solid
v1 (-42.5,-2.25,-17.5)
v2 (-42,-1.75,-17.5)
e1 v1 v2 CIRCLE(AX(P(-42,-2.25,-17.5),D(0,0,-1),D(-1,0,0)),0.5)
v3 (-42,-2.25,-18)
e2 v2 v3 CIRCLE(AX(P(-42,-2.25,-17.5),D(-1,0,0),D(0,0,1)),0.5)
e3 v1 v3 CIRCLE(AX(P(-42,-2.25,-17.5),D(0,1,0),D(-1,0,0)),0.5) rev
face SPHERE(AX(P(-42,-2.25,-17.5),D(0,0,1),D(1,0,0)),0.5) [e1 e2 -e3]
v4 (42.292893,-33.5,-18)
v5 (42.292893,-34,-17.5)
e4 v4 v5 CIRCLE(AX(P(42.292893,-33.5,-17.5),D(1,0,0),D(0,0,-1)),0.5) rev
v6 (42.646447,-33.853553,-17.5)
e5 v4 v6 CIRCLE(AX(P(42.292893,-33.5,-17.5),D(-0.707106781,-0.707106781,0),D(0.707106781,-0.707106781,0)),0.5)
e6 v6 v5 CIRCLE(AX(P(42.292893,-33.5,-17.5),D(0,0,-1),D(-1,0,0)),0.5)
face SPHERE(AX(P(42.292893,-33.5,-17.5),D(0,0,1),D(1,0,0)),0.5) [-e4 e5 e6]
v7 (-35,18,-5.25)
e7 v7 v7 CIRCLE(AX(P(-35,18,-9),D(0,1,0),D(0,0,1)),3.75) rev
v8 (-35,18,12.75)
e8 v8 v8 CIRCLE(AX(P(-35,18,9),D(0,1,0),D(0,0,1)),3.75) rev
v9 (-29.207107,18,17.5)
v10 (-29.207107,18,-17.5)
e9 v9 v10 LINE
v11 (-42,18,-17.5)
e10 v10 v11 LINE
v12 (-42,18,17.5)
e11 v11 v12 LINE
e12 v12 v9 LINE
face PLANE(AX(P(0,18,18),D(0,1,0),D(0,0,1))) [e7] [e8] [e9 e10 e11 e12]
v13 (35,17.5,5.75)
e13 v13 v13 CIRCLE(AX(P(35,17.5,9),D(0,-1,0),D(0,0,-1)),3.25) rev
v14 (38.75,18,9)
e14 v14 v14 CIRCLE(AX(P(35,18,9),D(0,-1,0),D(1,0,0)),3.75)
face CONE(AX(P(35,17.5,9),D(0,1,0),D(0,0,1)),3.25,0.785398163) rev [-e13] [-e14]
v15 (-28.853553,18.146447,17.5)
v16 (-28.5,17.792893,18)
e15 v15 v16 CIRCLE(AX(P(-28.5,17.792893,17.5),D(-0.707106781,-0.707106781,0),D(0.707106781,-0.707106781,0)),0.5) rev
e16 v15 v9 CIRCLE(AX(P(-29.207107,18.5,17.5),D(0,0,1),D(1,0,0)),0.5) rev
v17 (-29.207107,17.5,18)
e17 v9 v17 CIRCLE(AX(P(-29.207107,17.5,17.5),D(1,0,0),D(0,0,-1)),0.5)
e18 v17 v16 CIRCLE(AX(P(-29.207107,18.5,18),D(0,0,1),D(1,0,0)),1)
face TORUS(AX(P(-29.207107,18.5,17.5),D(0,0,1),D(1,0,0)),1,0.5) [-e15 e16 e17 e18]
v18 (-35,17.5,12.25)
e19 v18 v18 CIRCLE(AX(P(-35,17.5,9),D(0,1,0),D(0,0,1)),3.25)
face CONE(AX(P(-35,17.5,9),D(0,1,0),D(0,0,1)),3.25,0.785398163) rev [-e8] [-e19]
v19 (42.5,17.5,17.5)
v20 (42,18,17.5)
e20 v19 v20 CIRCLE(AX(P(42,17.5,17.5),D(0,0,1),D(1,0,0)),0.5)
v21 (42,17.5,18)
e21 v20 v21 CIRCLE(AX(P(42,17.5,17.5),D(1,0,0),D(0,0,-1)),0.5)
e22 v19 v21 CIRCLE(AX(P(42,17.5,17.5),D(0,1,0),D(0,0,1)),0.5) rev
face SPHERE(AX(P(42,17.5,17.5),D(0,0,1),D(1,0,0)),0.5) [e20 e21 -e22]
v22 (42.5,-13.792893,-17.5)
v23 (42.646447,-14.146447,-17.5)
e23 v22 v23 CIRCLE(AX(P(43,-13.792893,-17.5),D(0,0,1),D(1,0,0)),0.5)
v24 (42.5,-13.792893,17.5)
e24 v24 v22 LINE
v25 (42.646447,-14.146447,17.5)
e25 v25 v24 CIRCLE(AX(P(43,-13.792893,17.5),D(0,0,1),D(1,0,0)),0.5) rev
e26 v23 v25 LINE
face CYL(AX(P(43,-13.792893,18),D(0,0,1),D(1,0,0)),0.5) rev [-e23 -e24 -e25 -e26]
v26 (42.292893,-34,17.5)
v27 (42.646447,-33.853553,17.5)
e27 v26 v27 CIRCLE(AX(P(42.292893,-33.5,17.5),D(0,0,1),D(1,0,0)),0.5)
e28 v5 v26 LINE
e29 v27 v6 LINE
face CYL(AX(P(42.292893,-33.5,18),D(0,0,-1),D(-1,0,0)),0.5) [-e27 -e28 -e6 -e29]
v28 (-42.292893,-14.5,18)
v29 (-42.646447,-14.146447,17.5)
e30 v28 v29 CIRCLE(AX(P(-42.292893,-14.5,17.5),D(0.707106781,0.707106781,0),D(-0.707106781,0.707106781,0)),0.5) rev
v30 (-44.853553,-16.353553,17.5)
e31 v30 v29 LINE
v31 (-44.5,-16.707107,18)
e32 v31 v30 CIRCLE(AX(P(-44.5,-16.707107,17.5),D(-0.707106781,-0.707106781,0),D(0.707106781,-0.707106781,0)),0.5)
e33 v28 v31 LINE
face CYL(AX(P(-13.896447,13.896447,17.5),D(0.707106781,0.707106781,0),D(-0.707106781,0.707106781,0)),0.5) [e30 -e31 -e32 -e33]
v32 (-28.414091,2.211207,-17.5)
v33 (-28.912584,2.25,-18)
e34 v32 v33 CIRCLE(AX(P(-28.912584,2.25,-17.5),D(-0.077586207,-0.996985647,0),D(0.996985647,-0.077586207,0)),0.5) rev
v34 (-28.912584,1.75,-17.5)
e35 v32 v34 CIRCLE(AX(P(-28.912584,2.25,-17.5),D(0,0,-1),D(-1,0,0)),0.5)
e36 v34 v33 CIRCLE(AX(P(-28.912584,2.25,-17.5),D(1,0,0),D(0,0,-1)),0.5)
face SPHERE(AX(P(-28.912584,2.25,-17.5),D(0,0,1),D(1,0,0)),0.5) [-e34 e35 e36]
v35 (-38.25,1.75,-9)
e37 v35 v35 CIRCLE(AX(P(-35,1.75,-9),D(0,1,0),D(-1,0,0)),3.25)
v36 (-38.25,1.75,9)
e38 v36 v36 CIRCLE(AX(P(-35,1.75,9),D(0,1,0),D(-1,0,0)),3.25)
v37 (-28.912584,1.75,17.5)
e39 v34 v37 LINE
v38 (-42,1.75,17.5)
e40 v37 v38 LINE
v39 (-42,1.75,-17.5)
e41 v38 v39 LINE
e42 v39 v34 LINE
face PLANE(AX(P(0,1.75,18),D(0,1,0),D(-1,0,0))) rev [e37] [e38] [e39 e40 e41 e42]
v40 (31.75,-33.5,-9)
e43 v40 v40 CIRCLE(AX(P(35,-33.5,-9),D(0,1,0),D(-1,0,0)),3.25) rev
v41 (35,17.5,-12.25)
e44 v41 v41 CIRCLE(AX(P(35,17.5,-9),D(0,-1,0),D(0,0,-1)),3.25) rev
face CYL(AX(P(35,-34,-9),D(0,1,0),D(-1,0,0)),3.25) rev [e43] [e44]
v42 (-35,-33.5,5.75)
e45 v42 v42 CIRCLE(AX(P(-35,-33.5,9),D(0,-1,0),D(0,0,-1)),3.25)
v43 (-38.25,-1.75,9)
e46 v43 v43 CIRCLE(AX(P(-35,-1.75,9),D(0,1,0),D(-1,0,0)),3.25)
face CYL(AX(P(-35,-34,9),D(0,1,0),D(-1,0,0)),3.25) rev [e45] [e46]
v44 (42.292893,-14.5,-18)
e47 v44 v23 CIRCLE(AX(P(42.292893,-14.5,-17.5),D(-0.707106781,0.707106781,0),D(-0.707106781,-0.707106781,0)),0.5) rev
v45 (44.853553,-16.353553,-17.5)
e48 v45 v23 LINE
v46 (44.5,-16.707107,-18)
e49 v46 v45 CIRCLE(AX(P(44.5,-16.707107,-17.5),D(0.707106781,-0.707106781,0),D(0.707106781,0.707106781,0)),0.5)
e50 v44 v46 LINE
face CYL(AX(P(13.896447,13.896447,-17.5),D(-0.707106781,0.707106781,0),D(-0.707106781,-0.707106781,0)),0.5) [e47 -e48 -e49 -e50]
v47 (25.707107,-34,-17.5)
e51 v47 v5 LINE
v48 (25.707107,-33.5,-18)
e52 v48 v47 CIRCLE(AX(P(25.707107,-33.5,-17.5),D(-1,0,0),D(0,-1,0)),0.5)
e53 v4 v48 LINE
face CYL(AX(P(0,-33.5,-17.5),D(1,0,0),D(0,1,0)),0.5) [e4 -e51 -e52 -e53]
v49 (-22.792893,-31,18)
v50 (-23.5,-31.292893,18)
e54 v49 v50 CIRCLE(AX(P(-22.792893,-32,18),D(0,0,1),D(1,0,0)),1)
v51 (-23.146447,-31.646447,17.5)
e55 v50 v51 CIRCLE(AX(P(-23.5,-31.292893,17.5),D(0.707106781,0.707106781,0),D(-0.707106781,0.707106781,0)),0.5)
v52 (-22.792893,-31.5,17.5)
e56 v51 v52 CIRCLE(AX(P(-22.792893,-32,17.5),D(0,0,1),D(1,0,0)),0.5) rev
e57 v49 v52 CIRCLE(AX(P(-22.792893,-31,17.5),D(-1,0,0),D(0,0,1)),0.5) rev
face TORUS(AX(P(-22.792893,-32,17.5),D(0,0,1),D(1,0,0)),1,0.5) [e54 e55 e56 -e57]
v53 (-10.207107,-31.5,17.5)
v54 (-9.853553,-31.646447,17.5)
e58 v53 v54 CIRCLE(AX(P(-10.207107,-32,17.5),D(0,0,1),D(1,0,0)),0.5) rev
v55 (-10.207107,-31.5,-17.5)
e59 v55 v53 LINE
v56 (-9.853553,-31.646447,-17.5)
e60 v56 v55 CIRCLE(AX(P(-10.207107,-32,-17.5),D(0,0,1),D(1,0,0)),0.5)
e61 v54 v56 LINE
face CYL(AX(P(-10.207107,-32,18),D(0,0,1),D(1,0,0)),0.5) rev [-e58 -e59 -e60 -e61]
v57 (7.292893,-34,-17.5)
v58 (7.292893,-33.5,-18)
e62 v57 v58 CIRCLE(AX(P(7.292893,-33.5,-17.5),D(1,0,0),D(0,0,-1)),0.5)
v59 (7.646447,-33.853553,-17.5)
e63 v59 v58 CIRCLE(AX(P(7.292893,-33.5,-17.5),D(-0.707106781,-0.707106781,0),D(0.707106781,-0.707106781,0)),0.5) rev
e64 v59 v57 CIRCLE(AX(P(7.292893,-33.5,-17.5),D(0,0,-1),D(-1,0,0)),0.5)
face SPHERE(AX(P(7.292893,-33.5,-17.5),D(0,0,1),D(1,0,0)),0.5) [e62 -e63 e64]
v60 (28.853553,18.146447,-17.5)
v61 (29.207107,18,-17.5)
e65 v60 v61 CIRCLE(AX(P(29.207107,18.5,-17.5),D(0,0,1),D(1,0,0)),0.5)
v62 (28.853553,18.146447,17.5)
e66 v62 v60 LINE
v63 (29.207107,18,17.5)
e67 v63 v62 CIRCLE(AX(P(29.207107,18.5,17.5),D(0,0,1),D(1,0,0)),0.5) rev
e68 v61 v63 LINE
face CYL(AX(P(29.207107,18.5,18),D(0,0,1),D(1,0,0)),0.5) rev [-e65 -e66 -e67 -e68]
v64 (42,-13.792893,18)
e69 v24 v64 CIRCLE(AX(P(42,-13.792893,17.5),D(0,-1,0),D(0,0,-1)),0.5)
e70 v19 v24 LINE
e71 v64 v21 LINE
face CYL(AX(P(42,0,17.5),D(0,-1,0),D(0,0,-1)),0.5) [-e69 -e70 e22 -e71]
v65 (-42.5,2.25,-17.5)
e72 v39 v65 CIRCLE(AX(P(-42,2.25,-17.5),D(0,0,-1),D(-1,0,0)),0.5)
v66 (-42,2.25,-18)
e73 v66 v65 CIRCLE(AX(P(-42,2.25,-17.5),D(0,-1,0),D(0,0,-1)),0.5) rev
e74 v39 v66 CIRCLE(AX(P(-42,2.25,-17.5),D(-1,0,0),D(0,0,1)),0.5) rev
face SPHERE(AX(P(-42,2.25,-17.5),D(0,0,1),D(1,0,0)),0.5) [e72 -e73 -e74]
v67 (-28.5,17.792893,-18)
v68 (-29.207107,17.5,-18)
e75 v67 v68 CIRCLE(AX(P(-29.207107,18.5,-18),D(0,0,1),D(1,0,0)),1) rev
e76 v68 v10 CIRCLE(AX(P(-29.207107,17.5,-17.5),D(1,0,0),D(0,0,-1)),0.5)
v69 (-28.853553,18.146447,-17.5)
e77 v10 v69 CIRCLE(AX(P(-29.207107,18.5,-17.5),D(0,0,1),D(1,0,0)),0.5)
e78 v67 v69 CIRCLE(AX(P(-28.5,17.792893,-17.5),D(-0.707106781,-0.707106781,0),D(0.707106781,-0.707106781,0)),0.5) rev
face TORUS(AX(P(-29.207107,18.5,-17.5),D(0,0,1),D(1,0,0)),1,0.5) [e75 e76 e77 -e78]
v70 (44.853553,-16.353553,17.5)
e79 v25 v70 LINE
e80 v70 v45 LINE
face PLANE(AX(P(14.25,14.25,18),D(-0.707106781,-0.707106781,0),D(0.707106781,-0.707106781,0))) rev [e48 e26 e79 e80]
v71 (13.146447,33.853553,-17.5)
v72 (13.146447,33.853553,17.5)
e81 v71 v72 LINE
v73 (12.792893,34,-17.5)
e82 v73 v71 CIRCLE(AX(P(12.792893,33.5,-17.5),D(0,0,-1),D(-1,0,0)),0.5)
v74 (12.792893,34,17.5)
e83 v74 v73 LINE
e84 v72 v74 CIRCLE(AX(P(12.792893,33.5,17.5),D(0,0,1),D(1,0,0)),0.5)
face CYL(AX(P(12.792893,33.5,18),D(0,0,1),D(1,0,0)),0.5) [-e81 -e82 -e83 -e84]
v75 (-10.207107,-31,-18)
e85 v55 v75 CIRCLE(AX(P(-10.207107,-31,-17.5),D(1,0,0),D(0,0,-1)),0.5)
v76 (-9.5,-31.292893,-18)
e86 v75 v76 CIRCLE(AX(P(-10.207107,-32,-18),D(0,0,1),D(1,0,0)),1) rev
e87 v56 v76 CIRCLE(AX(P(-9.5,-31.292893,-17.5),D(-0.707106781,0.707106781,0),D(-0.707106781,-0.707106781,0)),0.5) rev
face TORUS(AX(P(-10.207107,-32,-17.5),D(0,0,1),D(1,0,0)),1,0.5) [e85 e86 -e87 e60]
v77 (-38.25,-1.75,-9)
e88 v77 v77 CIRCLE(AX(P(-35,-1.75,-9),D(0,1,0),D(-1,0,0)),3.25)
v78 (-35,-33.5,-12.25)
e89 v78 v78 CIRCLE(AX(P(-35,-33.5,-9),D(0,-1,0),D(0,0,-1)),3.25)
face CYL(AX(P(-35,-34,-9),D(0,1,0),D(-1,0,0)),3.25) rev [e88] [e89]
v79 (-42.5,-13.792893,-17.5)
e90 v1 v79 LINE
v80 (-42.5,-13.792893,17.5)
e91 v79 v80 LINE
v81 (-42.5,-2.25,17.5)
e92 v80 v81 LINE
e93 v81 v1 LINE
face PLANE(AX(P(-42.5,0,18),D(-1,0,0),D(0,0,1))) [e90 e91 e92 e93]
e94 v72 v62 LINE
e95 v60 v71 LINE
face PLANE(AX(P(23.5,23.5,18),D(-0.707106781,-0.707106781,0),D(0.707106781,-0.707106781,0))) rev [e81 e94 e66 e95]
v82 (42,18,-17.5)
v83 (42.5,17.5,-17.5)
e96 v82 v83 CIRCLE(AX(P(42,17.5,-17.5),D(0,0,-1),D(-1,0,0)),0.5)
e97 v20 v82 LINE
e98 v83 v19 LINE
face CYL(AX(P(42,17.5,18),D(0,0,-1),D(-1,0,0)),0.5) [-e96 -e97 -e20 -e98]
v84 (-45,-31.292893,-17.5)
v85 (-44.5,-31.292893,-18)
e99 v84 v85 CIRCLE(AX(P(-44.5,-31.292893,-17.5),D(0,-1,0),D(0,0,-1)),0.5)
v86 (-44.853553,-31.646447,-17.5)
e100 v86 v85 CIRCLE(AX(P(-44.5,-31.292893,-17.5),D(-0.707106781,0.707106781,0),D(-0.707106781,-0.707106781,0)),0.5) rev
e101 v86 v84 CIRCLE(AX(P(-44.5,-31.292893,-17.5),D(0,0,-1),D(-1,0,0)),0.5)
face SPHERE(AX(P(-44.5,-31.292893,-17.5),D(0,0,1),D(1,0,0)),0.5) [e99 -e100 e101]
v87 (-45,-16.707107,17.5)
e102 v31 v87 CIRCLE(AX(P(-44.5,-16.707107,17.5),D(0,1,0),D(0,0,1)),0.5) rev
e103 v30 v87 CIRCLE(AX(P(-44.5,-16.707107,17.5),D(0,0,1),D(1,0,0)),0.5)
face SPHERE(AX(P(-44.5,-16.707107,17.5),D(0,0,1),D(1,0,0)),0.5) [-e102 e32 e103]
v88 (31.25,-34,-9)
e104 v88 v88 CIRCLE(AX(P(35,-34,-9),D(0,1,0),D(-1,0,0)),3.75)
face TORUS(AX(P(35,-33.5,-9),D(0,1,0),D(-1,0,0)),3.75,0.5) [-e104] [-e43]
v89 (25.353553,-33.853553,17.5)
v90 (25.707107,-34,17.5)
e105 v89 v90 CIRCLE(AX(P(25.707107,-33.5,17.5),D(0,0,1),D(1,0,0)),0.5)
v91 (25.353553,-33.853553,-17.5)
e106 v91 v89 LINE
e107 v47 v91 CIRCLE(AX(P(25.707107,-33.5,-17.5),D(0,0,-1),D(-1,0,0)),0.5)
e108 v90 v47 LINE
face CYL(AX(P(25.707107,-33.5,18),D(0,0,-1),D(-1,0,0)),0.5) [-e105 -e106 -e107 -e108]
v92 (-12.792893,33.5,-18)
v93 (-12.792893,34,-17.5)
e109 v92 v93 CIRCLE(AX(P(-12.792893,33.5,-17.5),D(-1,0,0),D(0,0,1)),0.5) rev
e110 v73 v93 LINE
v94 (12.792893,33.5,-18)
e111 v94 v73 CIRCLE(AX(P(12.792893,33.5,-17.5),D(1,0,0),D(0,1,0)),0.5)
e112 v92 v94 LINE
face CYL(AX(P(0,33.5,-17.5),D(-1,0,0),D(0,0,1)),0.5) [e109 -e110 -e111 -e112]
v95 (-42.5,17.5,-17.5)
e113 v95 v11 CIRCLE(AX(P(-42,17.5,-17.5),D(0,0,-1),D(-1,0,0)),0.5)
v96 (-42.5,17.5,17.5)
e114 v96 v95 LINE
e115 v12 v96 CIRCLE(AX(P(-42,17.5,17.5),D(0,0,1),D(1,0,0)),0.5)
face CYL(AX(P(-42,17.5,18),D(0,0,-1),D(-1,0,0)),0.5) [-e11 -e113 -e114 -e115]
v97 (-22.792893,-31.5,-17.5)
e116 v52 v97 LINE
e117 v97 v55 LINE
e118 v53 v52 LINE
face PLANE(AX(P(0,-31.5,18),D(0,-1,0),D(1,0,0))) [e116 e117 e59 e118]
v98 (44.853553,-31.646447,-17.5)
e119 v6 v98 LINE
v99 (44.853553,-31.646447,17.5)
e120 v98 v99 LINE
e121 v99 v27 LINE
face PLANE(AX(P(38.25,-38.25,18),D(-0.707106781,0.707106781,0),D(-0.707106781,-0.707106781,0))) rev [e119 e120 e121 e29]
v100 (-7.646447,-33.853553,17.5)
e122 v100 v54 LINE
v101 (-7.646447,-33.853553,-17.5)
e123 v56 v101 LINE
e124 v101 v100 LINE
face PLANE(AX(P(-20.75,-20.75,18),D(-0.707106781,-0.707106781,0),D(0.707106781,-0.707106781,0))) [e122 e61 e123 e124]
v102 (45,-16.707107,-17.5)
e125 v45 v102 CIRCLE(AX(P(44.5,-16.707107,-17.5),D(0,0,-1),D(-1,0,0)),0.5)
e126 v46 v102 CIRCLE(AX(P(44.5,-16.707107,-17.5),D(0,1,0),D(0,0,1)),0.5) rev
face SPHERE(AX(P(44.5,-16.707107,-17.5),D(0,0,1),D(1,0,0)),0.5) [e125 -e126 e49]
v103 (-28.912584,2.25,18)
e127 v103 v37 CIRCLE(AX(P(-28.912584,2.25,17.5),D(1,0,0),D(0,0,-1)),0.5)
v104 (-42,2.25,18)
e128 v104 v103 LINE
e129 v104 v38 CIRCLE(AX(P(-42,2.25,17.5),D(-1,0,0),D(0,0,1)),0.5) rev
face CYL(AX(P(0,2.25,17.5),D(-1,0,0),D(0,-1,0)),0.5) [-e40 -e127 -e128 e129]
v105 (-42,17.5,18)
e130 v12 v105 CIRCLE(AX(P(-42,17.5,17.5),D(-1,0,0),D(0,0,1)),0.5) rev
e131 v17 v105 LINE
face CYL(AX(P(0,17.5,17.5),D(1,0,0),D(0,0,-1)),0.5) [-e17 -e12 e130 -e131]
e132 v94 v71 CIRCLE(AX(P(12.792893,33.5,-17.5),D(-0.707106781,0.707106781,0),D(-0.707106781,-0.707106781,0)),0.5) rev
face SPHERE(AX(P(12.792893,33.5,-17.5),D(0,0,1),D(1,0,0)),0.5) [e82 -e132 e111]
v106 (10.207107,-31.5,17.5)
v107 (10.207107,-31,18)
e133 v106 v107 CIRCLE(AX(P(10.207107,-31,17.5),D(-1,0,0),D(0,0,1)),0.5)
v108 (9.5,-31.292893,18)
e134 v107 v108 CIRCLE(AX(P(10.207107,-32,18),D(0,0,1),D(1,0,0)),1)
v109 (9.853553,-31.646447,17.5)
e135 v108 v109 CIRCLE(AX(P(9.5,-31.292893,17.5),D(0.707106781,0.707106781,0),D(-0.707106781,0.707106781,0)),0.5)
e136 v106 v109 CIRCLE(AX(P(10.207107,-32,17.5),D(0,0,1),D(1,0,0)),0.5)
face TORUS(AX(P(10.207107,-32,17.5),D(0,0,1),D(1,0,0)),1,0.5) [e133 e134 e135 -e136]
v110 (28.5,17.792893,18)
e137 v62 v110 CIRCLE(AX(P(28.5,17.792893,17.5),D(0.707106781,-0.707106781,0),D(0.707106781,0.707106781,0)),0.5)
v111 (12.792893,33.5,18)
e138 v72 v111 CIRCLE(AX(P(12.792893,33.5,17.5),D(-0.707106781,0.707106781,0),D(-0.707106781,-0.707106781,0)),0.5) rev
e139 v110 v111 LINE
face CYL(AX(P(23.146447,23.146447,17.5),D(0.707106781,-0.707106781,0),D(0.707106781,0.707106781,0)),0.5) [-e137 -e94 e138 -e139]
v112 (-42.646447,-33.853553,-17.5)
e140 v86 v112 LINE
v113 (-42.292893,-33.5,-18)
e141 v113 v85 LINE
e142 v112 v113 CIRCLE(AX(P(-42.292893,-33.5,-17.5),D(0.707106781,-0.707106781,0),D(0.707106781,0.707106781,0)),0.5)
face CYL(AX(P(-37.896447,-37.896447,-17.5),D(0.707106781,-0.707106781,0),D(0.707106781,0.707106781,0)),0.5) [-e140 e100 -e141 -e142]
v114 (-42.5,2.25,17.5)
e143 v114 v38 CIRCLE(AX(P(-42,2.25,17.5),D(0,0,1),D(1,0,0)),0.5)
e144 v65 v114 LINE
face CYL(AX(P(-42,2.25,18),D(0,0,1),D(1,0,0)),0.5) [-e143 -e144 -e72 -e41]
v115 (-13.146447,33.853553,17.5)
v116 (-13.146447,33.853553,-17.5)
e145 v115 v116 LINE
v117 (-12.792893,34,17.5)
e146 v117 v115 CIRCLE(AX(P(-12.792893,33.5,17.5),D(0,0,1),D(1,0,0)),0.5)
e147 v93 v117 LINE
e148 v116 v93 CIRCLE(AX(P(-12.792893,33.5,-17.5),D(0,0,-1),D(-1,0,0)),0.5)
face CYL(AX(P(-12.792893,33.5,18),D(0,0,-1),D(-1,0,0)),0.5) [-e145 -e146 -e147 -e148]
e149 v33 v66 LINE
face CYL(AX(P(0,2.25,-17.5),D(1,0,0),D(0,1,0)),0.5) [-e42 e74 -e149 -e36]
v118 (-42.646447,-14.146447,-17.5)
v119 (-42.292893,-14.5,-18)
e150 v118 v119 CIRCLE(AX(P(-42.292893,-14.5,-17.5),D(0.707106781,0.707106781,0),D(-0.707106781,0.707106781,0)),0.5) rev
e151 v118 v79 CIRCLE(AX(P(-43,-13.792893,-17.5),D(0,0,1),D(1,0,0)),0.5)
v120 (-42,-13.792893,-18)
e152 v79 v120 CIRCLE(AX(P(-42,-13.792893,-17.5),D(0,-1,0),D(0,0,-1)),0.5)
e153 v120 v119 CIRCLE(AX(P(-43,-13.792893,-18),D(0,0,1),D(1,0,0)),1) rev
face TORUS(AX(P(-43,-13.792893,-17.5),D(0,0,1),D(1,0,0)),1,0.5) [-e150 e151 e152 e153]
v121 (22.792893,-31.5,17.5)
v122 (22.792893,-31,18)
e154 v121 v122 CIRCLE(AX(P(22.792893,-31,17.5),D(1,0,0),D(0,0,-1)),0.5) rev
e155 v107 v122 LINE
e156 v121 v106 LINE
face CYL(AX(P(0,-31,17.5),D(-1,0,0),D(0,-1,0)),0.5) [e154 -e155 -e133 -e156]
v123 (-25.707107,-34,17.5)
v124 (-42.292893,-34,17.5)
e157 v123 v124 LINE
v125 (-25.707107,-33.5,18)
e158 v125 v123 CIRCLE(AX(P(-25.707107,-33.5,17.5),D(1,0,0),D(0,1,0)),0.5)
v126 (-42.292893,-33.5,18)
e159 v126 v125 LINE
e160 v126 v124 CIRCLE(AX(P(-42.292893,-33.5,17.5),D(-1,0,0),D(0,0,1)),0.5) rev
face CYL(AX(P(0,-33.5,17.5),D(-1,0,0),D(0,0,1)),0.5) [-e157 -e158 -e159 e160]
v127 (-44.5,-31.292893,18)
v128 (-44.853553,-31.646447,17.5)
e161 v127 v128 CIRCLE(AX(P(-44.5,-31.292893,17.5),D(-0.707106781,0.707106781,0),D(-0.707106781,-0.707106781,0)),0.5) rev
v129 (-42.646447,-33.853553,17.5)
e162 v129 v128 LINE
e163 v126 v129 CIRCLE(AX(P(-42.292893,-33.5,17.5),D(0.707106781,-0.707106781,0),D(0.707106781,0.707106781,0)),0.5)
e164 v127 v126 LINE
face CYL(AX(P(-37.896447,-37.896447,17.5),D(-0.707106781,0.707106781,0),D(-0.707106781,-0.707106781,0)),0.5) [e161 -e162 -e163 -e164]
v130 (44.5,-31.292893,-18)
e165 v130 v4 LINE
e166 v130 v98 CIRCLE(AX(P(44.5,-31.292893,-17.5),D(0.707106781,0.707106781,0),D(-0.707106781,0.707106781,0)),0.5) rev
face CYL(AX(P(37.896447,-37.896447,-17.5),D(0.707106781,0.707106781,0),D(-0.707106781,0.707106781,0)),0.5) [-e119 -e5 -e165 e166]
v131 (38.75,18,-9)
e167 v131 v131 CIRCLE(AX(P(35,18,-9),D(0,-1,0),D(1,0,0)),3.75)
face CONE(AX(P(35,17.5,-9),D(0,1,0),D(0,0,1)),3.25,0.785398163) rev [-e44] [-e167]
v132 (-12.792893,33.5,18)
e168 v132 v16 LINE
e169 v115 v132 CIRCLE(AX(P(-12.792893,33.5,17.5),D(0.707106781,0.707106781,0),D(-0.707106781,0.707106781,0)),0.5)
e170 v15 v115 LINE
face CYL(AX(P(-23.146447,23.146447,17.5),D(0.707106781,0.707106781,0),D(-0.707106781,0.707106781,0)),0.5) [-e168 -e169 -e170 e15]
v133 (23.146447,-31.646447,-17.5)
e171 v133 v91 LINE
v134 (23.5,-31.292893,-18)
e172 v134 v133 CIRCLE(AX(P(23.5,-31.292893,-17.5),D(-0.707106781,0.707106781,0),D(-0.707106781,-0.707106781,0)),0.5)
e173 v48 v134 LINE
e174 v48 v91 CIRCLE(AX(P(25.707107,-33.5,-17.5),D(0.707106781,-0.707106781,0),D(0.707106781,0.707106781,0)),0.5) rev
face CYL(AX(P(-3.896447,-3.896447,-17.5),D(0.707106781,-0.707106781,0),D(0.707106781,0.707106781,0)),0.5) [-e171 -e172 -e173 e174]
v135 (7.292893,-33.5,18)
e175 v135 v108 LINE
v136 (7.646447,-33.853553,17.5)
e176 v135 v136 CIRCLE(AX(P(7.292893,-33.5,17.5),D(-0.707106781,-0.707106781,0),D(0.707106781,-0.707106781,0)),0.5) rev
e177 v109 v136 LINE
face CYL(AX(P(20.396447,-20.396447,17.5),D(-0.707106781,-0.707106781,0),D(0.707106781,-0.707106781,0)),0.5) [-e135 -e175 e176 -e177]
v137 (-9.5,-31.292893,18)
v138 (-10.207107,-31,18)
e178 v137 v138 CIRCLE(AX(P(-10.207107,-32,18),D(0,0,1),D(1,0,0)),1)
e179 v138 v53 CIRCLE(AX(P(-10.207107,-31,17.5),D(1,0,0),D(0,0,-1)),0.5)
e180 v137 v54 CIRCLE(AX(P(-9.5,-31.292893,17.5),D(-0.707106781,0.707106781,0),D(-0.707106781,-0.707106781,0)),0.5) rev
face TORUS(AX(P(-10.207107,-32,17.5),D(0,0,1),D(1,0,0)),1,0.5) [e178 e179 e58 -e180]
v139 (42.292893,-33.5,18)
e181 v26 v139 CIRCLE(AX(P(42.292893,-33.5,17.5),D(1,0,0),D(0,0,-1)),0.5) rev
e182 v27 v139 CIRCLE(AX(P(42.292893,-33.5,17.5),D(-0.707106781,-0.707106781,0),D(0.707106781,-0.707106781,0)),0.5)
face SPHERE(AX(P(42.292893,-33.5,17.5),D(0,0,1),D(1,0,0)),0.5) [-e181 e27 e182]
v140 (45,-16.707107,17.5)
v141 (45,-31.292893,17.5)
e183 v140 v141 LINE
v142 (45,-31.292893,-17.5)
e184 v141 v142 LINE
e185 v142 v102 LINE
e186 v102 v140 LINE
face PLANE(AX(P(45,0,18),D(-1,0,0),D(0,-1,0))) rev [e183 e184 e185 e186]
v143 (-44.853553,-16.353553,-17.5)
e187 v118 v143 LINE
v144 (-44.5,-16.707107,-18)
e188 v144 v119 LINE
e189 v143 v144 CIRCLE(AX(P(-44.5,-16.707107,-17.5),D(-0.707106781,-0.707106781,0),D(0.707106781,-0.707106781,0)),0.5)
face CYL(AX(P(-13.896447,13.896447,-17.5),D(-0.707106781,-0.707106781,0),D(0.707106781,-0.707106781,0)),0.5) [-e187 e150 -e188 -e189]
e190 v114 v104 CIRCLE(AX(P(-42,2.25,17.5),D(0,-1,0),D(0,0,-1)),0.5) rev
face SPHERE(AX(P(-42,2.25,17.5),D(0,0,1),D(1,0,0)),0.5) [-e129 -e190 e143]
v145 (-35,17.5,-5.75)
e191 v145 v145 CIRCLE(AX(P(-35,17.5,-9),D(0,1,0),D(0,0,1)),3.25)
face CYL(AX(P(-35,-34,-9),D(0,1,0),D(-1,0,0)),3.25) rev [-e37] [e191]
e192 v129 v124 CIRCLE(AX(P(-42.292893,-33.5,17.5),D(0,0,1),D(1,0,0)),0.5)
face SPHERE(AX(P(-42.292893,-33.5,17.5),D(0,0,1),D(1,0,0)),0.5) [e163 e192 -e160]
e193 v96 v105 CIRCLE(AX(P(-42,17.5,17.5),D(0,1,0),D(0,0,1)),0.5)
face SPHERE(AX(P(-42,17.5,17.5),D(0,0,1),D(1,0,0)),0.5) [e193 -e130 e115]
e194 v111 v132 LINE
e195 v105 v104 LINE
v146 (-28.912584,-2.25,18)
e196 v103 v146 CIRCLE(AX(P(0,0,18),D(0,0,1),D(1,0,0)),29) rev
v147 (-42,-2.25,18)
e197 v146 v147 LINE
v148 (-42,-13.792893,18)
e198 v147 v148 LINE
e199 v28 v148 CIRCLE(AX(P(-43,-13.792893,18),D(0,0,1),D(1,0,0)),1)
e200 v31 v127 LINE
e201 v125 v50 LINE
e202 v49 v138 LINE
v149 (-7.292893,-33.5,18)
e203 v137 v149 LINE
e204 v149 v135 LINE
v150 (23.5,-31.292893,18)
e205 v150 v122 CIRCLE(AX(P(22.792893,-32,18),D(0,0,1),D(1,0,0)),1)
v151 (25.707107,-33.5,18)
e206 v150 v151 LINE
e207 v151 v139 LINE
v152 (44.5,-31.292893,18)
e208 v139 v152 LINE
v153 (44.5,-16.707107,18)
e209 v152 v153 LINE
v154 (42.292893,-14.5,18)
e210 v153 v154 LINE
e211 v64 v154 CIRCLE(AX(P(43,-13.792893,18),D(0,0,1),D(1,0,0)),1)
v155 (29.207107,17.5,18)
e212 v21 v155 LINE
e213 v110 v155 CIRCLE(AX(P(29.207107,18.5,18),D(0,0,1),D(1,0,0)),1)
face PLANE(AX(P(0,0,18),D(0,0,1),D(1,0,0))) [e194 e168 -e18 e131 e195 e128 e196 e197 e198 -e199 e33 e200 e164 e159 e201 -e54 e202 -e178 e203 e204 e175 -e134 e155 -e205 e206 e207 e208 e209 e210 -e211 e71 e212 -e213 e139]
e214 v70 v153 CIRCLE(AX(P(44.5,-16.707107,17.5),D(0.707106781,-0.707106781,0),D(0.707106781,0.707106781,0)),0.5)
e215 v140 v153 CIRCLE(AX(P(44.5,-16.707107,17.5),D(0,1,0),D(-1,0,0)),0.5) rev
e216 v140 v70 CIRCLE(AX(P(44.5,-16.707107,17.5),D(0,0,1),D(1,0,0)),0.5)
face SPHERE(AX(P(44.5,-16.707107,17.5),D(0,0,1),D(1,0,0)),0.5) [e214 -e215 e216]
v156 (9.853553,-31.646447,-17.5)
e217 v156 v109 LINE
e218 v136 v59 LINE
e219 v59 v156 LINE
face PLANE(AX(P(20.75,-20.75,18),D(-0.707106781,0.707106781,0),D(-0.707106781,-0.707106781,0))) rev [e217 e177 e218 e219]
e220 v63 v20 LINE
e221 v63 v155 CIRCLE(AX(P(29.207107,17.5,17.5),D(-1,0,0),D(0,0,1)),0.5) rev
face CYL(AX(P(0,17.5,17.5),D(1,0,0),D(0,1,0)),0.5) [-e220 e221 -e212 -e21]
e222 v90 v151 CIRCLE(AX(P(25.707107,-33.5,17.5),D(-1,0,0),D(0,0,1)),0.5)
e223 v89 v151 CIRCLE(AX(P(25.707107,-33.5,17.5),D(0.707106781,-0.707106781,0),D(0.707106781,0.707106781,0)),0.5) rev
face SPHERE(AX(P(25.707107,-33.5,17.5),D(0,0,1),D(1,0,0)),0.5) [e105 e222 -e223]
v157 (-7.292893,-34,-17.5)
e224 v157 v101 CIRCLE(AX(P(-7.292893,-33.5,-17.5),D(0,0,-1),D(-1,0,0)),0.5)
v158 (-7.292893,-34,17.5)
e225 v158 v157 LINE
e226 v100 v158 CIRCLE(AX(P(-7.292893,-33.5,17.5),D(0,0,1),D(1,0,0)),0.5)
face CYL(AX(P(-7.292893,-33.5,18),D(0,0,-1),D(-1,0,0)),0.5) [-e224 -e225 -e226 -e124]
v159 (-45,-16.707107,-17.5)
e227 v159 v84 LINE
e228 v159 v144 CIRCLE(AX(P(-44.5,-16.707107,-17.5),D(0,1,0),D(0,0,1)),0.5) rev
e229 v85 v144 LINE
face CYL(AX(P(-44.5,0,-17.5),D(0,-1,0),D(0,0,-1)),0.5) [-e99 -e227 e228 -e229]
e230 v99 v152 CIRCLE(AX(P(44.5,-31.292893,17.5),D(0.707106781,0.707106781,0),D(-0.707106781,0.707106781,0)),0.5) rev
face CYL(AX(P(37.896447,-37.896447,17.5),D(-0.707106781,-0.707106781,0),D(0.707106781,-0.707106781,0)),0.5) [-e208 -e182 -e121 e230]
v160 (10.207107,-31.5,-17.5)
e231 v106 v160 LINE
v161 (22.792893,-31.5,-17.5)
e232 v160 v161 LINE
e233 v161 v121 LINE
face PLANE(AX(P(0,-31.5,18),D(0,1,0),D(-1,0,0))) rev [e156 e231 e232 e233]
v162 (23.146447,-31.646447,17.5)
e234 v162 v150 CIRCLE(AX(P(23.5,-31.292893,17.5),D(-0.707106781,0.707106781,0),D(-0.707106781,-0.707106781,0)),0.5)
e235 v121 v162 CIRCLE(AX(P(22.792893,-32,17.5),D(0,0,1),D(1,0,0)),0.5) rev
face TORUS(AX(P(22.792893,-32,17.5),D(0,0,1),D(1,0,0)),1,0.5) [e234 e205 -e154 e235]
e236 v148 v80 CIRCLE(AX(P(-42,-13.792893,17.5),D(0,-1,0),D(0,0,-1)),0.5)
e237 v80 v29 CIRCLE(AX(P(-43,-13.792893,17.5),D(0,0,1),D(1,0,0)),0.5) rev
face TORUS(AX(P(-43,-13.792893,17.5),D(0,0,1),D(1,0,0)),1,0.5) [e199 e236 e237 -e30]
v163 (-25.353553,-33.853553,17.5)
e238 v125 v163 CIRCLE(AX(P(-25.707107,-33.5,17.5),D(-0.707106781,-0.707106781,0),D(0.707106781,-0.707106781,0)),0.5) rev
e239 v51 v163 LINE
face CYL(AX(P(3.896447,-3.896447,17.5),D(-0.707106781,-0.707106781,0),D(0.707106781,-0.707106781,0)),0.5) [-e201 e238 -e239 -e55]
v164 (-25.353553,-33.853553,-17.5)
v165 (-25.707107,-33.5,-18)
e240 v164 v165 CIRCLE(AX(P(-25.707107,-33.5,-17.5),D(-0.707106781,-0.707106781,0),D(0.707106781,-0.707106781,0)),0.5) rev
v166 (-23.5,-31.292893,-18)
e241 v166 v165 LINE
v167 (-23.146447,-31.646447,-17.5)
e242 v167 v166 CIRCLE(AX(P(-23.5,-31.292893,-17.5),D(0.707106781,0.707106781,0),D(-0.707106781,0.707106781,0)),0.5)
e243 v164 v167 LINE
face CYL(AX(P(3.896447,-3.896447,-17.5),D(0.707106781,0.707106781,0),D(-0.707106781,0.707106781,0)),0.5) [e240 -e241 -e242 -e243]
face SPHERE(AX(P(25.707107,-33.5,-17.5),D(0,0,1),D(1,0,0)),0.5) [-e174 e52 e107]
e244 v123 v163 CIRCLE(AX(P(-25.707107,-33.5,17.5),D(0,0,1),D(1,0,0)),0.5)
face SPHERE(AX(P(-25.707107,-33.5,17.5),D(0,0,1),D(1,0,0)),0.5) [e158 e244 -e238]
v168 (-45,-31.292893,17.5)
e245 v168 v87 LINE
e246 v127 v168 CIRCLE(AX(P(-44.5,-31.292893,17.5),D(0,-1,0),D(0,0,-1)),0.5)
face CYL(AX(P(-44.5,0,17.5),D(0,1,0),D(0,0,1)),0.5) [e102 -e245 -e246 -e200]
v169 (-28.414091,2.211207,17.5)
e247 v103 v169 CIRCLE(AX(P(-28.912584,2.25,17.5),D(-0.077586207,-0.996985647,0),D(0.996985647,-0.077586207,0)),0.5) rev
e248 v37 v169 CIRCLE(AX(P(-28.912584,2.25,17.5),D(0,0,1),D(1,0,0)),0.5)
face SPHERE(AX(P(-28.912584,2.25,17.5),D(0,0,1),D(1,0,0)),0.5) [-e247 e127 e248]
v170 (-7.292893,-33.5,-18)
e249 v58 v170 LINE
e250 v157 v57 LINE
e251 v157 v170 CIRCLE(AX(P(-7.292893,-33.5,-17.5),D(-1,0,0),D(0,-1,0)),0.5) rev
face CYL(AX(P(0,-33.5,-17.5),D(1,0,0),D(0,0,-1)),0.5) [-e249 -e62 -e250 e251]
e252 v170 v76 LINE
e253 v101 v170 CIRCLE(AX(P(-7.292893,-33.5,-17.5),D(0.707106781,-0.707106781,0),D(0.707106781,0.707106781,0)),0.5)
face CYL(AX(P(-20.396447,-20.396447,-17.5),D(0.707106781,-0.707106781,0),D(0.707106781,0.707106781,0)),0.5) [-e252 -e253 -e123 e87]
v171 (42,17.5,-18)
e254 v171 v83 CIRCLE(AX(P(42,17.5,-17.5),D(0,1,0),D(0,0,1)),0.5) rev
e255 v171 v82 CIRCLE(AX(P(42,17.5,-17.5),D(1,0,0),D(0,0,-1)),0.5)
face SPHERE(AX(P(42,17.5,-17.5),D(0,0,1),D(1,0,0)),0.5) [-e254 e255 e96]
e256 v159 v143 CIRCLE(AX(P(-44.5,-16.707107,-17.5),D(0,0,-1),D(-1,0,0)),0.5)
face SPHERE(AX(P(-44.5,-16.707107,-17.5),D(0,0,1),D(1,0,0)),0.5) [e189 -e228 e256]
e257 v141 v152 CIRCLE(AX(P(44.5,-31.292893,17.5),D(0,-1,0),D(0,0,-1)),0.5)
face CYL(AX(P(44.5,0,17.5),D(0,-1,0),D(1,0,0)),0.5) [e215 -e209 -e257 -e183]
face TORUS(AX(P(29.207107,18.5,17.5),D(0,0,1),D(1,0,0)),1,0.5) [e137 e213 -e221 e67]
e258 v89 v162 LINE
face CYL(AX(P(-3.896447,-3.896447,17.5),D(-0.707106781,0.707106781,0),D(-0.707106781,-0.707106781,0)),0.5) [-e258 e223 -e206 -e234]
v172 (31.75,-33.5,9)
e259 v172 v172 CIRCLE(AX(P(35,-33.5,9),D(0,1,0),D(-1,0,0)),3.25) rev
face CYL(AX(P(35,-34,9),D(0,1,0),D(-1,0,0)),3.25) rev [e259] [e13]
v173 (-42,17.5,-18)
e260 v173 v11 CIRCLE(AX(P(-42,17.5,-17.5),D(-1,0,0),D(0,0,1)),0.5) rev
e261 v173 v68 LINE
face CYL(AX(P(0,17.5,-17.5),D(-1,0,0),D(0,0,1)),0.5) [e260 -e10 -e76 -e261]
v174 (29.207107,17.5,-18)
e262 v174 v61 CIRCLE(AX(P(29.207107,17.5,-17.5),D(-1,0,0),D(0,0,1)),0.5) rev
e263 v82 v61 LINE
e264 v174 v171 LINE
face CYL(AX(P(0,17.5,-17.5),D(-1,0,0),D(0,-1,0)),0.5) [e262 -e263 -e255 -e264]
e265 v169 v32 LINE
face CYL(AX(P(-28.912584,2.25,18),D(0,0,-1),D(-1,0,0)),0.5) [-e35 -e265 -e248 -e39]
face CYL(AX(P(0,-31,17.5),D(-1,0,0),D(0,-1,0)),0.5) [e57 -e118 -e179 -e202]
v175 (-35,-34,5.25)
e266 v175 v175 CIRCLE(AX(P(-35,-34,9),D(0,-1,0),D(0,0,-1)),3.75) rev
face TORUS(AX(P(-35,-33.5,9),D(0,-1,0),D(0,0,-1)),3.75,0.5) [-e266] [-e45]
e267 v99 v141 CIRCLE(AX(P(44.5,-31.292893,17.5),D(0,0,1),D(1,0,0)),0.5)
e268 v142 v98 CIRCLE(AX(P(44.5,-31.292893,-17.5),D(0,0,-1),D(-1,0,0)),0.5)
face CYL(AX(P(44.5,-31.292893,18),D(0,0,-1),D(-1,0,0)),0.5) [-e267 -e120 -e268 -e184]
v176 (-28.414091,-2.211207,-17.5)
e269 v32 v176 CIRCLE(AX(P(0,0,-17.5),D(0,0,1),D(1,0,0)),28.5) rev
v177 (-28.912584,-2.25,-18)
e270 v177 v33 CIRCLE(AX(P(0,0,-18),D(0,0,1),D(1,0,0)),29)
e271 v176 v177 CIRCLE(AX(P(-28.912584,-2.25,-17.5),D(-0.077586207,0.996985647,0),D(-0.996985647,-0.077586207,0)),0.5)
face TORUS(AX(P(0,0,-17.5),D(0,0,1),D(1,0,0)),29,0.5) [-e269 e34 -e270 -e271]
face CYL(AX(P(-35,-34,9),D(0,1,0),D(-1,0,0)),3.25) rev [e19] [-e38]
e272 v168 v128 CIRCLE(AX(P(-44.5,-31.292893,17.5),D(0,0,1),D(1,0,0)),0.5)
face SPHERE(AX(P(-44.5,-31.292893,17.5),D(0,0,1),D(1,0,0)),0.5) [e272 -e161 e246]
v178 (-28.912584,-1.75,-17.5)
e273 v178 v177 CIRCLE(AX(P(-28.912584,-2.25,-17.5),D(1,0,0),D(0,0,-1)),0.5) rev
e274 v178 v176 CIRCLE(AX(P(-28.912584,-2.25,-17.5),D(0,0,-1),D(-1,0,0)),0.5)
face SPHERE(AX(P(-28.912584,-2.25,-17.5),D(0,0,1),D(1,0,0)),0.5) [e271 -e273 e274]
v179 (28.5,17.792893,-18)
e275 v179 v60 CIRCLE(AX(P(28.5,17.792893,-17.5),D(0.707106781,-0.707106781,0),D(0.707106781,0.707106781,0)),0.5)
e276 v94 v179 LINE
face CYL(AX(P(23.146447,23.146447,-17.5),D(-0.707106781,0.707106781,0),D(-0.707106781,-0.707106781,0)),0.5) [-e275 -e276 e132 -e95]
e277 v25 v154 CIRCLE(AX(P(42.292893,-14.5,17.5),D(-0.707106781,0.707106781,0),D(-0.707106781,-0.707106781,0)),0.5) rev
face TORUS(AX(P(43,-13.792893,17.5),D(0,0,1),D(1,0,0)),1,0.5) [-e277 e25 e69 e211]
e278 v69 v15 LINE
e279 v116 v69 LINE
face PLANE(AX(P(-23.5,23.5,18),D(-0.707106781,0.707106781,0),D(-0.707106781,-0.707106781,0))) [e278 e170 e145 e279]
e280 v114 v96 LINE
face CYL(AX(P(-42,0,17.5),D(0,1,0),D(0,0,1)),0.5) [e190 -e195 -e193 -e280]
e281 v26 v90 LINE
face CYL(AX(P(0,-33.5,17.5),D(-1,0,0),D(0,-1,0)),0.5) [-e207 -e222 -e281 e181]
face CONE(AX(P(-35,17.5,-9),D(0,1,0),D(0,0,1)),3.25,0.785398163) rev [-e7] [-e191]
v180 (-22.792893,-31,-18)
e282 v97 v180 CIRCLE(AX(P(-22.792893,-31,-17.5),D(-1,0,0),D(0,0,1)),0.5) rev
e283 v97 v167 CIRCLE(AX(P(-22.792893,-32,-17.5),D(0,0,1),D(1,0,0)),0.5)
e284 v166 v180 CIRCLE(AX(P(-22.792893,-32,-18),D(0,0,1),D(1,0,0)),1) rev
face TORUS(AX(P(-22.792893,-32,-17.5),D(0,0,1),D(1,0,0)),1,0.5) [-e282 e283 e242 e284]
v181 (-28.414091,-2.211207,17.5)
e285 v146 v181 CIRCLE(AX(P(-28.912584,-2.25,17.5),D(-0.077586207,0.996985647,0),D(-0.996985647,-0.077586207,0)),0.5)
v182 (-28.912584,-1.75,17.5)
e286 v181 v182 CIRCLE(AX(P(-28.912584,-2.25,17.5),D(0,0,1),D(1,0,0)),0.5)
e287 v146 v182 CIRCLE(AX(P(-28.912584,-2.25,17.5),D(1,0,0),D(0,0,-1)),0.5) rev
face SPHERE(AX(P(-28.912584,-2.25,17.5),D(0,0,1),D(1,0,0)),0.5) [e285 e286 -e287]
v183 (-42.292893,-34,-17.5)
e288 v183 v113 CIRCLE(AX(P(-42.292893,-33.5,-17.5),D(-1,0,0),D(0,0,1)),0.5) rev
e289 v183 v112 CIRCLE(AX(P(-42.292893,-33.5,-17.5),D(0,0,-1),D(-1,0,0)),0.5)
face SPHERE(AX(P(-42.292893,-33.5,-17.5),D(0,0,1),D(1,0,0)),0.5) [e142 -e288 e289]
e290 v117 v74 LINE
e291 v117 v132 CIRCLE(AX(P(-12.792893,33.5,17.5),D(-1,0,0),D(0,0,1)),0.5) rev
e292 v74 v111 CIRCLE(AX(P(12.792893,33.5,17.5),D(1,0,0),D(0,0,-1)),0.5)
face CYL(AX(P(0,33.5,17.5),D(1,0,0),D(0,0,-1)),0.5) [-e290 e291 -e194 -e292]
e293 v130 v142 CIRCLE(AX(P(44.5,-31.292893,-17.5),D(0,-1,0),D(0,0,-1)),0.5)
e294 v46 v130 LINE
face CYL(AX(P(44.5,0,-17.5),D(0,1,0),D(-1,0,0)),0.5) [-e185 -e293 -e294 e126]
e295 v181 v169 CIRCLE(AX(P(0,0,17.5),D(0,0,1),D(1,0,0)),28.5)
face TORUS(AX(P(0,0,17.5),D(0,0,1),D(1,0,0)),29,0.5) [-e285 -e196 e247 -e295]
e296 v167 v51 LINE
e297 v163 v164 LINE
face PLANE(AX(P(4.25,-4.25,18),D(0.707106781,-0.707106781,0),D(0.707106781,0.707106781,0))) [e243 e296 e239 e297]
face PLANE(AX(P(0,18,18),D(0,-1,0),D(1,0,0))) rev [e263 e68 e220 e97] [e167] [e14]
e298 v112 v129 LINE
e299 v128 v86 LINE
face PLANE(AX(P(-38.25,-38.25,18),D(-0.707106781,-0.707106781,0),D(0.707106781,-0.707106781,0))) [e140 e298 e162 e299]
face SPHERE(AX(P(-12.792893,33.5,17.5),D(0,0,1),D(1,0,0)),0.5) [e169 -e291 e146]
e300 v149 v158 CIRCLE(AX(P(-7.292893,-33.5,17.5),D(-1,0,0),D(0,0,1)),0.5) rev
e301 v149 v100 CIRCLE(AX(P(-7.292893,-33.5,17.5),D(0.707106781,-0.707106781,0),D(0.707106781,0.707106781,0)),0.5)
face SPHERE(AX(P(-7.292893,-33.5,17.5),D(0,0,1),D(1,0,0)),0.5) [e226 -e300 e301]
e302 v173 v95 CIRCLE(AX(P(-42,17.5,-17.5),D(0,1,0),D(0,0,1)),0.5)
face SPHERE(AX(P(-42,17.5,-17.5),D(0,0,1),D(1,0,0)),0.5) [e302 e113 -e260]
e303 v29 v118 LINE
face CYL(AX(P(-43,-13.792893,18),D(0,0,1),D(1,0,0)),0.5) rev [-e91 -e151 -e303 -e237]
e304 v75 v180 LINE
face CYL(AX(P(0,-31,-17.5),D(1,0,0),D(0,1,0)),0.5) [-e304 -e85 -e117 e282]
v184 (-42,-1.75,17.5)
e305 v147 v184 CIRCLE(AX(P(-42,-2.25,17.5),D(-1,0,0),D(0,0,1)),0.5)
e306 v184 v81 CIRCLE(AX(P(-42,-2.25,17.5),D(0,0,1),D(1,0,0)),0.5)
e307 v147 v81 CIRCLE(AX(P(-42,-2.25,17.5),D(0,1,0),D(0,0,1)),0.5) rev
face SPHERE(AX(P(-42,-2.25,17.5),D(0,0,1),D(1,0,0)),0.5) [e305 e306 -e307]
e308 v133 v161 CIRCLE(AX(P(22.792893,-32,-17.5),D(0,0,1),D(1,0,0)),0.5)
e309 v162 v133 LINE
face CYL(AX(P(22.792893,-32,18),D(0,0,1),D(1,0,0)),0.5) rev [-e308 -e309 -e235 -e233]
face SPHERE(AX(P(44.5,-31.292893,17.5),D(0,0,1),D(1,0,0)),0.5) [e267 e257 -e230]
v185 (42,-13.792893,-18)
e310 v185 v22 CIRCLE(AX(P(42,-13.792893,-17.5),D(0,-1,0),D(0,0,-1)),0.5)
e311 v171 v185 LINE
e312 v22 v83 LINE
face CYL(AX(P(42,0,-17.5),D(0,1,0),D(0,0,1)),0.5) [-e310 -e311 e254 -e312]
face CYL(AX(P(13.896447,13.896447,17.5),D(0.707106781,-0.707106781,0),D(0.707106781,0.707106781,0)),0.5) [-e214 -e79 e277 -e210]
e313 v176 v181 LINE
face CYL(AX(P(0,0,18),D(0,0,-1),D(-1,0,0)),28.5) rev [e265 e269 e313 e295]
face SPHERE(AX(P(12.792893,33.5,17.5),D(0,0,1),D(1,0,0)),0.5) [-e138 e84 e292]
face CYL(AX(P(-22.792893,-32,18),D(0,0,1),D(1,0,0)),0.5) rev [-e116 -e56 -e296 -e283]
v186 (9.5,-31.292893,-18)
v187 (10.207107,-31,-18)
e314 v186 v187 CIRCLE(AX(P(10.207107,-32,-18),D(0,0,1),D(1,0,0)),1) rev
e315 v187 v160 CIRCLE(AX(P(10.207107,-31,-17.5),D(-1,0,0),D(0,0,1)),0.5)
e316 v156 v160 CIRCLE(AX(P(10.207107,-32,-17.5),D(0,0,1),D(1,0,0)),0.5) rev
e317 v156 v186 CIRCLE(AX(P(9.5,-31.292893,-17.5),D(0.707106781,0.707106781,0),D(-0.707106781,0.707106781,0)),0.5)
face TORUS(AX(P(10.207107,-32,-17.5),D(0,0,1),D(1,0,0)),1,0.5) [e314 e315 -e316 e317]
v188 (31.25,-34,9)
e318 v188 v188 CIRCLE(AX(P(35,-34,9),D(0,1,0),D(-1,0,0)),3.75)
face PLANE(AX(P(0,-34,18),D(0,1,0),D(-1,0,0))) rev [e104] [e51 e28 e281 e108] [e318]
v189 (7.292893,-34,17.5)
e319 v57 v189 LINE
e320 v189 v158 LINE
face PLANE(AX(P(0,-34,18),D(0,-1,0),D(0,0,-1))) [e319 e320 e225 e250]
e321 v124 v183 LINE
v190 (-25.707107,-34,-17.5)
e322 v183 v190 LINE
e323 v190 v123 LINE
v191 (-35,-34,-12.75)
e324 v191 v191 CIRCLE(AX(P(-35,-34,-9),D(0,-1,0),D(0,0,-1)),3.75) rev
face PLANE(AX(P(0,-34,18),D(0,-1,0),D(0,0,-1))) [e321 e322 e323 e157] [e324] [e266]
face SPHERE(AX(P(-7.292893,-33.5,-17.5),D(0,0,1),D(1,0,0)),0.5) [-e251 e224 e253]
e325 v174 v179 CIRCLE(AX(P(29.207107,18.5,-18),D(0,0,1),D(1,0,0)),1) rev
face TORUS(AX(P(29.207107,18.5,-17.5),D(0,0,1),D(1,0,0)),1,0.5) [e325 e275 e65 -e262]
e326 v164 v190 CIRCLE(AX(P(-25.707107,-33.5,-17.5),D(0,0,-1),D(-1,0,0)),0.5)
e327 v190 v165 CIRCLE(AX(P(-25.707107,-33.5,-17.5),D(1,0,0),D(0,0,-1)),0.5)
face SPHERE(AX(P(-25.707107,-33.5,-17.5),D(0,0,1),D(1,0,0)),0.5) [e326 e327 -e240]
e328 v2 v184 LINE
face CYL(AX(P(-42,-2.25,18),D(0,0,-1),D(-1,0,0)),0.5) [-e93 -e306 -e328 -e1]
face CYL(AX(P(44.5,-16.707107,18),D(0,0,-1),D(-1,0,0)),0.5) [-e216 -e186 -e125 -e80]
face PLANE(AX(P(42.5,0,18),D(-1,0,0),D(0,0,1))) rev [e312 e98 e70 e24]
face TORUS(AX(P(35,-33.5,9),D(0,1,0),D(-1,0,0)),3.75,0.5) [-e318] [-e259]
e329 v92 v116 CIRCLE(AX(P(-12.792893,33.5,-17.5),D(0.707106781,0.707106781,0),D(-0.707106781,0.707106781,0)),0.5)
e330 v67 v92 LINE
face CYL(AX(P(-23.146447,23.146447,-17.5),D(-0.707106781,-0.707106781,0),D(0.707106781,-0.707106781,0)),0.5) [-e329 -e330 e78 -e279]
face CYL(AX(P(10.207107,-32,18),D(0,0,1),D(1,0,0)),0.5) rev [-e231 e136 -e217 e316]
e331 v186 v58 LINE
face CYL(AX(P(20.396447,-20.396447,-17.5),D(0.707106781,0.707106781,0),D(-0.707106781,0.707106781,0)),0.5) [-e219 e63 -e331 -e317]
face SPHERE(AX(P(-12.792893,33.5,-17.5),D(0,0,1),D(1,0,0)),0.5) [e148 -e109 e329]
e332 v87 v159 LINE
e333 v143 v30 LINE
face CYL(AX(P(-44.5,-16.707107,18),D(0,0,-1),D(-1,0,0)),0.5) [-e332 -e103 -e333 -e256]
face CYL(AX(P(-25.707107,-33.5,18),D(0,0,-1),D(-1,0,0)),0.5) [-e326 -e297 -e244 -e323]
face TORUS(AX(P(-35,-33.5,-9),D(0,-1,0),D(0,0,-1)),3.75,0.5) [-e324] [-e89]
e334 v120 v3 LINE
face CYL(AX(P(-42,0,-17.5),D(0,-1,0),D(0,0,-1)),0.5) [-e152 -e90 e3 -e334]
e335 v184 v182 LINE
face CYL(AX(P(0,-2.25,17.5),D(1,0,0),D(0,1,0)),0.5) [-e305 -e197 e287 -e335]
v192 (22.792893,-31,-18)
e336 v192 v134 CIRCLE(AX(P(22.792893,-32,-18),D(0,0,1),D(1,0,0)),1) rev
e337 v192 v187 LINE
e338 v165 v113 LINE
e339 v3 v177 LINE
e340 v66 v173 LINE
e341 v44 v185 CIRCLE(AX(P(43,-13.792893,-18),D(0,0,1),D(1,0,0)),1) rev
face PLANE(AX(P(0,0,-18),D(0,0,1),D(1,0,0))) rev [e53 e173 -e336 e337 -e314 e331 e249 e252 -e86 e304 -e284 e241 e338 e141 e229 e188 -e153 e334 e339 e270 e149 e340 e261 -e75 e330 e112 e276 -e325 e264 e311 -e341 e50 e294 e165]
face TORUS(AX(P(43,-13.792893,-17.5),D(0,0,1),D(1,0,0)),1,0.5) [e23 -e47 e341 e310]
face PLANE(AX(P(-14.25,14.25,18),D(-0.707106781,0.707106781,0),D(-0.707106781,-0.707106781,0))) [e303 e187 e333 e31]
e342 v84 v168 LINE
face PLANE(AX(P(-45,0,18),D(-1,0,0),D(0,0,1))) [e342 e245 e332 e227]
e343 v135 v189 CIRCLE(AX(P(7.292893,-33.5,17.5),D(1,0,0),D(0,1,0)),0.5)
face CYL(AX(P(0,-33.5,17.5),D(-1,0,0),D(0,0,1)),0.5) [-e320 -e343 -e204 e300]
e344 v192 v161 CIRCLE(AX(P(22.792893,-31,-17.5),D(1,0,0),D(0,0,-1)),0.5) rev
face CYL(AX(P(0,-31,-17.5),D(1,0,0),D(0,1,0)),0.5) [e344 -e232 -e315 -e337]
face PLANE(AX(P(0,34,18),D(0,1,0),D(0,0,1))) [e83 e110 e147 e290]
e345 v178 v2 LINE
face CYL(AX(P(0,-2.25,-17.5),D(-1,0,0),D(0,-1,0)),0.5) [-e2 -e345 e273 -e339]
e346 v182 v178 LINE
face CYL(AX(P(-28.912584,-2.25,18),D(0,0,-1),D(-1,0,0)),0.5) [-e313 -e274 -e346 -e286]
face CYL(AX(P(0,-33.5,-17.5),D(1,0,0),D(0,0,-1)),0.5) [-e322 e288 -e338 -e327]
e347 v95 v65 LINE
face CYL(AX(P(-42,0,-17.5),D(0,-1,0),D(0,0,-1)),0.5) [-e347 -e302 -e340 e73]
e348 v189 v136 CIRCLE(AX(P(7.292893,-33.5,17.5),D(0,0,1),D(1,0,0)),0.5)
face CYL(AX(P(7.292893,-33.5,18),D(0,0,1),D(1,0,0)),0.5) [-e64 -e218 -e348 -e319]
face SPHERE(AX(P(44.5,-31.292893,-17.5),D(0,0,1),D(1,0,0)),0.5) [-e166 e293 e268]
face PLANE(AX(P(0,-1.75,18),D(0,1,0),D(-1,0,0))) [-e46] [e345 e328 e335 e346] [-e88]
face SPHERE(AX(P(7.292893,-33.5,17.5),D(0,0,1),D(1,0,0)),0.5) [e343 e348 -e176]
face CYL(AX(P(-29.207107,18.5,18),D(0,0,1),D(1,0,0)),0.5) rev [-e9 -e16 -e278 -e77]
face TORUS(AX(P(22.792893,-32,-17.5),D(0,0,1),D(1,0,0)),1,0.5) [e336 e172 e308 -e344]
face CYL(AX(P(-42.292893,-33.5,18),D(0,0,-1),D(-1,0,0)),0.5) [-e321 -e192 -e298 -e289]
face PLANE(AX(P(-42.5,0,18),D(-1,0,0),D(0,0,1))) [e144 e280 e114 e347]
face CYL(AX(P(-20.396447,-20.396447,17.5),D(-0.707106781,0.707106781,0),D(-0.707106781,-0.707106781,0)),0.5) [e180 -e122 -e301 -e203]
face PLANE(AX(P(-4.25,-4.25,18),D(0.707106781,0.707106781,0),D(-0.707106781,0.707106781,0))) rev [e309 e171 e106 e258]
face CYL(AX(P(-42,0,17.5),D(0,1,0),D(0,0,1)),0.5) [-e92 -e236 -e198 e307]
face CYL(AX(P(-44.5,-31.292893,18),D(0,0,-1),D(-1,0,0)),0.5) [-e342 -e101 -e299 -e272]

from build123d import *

# Parameters (mm, degrees)
EXTRUDE_1_DEPTH         = 18
CUT_EXTRUDE_START       = -34
CUT_EXTRUDE_1_OUTLINE_R = 3.25
CUT_EXTRUDE_1_DEPTH     = 52
CHAMFER_1_SIZE          = 0.5
FILLET_1_R              = 0.5


# Read off the part's stored shape, not the designer's step: Вырез-Вытянуть1
with BuildPart() as part:
    # Эскиз1 → Бобышка-Вытянуть1 (new, symmetric)
    with BuildSketch(Plane.XY):
        with BuildLine():
            Line((-7.5, -34), (7.5, -34))
            Line((7.5, -34), (10, -31.5))
            Line((10, -31.5), (23, -31.5))
            Line((23, -31.5), (25.5, -34))
            Line((25.5, -34), (42.5, -34))
            Line((42.5, -34), (45, -31.5))
            Line((45, -31.5), (45, -16.5))
            Line((45, -16.5), (42.5, -14))
            Line((42.5, -14), (42.5, 18))
            Line((42.5, 18), (29, 18))
            Line((29, 18), (13, 34))
            Line((13, 34), (-13, 34))
            Line((-13, 34), (-29, 18))
            Line((-29, 18), (-42.5, 18))
            Line((-42.5, 18), (-42.5, 1.75))
            Line((-42.5, 1.75), (-28.44622119, 1.75))
            ThreePointArc((-28.44622119, 1.75), (0.875413068, 28.486552125), (28.5, 0))
            ThreePointArc((28.5, 0), (0.875413068, -28.486552125), (-28.44622119, -1.75))
            Line((-28.44622119, -1.75), (-42.5, -1.75))
            Line((-42.5, -1.75), (-42.5, -14))
            Line((-42.5, -14), (-45, -16.5))
            Line((-45, -16.5), (-45, -31.5))
            Line((-45, -31.5), (-42.5, -34))
            Line((-42.5, -34), (-25.5, -34))
            Line((-25.5, -34), (-23, -31.5))
            Line((-23, -31.5), (-10, -31.5))
            Line((-10, -31.5), (-7.5, -34))
        make_face()
    extrude(amount=EXTRUDE_1_DEPTH, both=True)

    # Вырез-Вытянуть1 outline → Вырез-Вытянуть1 (cut)
    with BuildSketch(Plane(origin=(0, 0, 0), x_dir=(1, 0, 0), z_dir=(0, 1, 0)).offset(CUT_EXTRUDE_START)):
        with Locations((-35, 9)):
            Circle(CUT_EXTRUDE_1_OUTLINE_R)
        with Locations((-35, -9)):
            Circle(CUT_EXTRUDE_1_OUTLINE_R)
        with Locations((35, 9)):
            Circle(CUT_EXTRUDE_1_OUTLINE_R)
        with Locations((35, -9)):
            Circle(CUT_EXTRUDE_1_OUTLINE_R)
    extrude(amount=CUT_EXTRUDE_1_DEPTH, mode=Mode.SUBTRACT)

    # Фаска1
    chamfer_1_edges = [part.edges().sort_by_distance(p)[0] for p in [
        (-38.25, 18, -9),
        (-38.25, 18, 9),
        (31.75, 18, 9),
        (31.75, 18, -9),
    ]]
    chamfer(chamfer_1_edges, length=CHAMFER_1_SIZE)

    # Скругление1
    fillet_1_edges = [part.edges().sort_by_distance(p)[0] for p in [
        (-42.5, 9.875, 18),
        (-35.473110595, 1.75, 18),
        (-42.5, -7.875, 18),
        (-43.75, -15.25, 18),
        (-45, -24, 18),
        (-43.75, -32.75, 18),
        (-35.473110595, 1.75, -18),
        (-42.5, 9.875, -18),
        (-35.75, 18, -18),
        (-21, 26, -18),
        (0, 34, -18),
        (21, 26, -18),
        (35.75, 18, -18),
        (42.5, 2, -18),
        (-34, -34, 18),
        (43.75, -15.25, -18),
        (45, -24, -18),
        (43.75, -32.75, -18),
        (34, -34, -18),
        (24.25, -32.75, -18),
        (16.5, -31.5, -18),
        (8.75, -32.75, -18),
        (0, -34, -18),
        (-24.25, -32.75, 18),
        (-8.75, -32.75, -18),
        (-16.5, -31.5, -18),
        (-24.25, -32.75, -18),
        (-34, -34, -18),
        (-43.75, -32.75, -18),
        (-45, -24, -18),
        (-43.75, -15.25, -18),
        (-42.5, -7.875, -18),
        (-16.5, -31.5, 18),
        (-35.473110595, -1.75, -18),
        (28.5, 0, -18),
        (-8.75, -32.75, 18),
        (0, -34, 18),
        (-28.44622119, 1.75, 0),
        (-42.5, 1.75, 0),
        (-42.5, 18, 0),
        (-29, 18, 0),
        (-13, 34, 0),
        (13, 34, 0),
        (29, 18, 0),
        (42.5, 18, 0),
        (42.5, -14, 0),
        (45, -16.5, 0),
        (45, -31.5, 0),
        (42.5, -34, 0),
        (25.5, -34, 0),
        (23, -31.5, 0),
        (10, -31.5, 0),
        (7.5, -34, 0),
        (-7.5, -34, 0),
        (-10, -31.5, 0),
        (-23, -31.5, 0),
        (-25.5, -34, 0),
        (-42.5, -34, 0),
        (-45, -31.5, 0),
        (-45, -16.5, 0),
        (-42.5, -14, 0),
        (-42.5, -1.75, 0),
        (-28.44622119, -1.75, 0),
        (8.75, -32.75, 18),
        (28.5, 0, 18),
        (16.5, -31.5, 18),
        (24.25, -32.75, 18),
        (34, -34, 18),
        (43.75, -32.75, 18),
        (45, -24, 18),
        (43.75, -15.25, 18),
        (-38.25, -34, -9),
        (42.5, 2, 18),
        (35.75, 18, 18),
        (21, 26, 18),
        (-38.25, -34, 9),
        (31.75, -34, 9),
        (0, 34, 18),
        (-35.473110595, -1.75, 18),
        (31.75, -34, -9),
        (-21, 26, 18),
        (-35.75, 18, 18),
    ]]
    fillet(fillet_1_edges, radius=FILLET_1_R)


solid = part.part
